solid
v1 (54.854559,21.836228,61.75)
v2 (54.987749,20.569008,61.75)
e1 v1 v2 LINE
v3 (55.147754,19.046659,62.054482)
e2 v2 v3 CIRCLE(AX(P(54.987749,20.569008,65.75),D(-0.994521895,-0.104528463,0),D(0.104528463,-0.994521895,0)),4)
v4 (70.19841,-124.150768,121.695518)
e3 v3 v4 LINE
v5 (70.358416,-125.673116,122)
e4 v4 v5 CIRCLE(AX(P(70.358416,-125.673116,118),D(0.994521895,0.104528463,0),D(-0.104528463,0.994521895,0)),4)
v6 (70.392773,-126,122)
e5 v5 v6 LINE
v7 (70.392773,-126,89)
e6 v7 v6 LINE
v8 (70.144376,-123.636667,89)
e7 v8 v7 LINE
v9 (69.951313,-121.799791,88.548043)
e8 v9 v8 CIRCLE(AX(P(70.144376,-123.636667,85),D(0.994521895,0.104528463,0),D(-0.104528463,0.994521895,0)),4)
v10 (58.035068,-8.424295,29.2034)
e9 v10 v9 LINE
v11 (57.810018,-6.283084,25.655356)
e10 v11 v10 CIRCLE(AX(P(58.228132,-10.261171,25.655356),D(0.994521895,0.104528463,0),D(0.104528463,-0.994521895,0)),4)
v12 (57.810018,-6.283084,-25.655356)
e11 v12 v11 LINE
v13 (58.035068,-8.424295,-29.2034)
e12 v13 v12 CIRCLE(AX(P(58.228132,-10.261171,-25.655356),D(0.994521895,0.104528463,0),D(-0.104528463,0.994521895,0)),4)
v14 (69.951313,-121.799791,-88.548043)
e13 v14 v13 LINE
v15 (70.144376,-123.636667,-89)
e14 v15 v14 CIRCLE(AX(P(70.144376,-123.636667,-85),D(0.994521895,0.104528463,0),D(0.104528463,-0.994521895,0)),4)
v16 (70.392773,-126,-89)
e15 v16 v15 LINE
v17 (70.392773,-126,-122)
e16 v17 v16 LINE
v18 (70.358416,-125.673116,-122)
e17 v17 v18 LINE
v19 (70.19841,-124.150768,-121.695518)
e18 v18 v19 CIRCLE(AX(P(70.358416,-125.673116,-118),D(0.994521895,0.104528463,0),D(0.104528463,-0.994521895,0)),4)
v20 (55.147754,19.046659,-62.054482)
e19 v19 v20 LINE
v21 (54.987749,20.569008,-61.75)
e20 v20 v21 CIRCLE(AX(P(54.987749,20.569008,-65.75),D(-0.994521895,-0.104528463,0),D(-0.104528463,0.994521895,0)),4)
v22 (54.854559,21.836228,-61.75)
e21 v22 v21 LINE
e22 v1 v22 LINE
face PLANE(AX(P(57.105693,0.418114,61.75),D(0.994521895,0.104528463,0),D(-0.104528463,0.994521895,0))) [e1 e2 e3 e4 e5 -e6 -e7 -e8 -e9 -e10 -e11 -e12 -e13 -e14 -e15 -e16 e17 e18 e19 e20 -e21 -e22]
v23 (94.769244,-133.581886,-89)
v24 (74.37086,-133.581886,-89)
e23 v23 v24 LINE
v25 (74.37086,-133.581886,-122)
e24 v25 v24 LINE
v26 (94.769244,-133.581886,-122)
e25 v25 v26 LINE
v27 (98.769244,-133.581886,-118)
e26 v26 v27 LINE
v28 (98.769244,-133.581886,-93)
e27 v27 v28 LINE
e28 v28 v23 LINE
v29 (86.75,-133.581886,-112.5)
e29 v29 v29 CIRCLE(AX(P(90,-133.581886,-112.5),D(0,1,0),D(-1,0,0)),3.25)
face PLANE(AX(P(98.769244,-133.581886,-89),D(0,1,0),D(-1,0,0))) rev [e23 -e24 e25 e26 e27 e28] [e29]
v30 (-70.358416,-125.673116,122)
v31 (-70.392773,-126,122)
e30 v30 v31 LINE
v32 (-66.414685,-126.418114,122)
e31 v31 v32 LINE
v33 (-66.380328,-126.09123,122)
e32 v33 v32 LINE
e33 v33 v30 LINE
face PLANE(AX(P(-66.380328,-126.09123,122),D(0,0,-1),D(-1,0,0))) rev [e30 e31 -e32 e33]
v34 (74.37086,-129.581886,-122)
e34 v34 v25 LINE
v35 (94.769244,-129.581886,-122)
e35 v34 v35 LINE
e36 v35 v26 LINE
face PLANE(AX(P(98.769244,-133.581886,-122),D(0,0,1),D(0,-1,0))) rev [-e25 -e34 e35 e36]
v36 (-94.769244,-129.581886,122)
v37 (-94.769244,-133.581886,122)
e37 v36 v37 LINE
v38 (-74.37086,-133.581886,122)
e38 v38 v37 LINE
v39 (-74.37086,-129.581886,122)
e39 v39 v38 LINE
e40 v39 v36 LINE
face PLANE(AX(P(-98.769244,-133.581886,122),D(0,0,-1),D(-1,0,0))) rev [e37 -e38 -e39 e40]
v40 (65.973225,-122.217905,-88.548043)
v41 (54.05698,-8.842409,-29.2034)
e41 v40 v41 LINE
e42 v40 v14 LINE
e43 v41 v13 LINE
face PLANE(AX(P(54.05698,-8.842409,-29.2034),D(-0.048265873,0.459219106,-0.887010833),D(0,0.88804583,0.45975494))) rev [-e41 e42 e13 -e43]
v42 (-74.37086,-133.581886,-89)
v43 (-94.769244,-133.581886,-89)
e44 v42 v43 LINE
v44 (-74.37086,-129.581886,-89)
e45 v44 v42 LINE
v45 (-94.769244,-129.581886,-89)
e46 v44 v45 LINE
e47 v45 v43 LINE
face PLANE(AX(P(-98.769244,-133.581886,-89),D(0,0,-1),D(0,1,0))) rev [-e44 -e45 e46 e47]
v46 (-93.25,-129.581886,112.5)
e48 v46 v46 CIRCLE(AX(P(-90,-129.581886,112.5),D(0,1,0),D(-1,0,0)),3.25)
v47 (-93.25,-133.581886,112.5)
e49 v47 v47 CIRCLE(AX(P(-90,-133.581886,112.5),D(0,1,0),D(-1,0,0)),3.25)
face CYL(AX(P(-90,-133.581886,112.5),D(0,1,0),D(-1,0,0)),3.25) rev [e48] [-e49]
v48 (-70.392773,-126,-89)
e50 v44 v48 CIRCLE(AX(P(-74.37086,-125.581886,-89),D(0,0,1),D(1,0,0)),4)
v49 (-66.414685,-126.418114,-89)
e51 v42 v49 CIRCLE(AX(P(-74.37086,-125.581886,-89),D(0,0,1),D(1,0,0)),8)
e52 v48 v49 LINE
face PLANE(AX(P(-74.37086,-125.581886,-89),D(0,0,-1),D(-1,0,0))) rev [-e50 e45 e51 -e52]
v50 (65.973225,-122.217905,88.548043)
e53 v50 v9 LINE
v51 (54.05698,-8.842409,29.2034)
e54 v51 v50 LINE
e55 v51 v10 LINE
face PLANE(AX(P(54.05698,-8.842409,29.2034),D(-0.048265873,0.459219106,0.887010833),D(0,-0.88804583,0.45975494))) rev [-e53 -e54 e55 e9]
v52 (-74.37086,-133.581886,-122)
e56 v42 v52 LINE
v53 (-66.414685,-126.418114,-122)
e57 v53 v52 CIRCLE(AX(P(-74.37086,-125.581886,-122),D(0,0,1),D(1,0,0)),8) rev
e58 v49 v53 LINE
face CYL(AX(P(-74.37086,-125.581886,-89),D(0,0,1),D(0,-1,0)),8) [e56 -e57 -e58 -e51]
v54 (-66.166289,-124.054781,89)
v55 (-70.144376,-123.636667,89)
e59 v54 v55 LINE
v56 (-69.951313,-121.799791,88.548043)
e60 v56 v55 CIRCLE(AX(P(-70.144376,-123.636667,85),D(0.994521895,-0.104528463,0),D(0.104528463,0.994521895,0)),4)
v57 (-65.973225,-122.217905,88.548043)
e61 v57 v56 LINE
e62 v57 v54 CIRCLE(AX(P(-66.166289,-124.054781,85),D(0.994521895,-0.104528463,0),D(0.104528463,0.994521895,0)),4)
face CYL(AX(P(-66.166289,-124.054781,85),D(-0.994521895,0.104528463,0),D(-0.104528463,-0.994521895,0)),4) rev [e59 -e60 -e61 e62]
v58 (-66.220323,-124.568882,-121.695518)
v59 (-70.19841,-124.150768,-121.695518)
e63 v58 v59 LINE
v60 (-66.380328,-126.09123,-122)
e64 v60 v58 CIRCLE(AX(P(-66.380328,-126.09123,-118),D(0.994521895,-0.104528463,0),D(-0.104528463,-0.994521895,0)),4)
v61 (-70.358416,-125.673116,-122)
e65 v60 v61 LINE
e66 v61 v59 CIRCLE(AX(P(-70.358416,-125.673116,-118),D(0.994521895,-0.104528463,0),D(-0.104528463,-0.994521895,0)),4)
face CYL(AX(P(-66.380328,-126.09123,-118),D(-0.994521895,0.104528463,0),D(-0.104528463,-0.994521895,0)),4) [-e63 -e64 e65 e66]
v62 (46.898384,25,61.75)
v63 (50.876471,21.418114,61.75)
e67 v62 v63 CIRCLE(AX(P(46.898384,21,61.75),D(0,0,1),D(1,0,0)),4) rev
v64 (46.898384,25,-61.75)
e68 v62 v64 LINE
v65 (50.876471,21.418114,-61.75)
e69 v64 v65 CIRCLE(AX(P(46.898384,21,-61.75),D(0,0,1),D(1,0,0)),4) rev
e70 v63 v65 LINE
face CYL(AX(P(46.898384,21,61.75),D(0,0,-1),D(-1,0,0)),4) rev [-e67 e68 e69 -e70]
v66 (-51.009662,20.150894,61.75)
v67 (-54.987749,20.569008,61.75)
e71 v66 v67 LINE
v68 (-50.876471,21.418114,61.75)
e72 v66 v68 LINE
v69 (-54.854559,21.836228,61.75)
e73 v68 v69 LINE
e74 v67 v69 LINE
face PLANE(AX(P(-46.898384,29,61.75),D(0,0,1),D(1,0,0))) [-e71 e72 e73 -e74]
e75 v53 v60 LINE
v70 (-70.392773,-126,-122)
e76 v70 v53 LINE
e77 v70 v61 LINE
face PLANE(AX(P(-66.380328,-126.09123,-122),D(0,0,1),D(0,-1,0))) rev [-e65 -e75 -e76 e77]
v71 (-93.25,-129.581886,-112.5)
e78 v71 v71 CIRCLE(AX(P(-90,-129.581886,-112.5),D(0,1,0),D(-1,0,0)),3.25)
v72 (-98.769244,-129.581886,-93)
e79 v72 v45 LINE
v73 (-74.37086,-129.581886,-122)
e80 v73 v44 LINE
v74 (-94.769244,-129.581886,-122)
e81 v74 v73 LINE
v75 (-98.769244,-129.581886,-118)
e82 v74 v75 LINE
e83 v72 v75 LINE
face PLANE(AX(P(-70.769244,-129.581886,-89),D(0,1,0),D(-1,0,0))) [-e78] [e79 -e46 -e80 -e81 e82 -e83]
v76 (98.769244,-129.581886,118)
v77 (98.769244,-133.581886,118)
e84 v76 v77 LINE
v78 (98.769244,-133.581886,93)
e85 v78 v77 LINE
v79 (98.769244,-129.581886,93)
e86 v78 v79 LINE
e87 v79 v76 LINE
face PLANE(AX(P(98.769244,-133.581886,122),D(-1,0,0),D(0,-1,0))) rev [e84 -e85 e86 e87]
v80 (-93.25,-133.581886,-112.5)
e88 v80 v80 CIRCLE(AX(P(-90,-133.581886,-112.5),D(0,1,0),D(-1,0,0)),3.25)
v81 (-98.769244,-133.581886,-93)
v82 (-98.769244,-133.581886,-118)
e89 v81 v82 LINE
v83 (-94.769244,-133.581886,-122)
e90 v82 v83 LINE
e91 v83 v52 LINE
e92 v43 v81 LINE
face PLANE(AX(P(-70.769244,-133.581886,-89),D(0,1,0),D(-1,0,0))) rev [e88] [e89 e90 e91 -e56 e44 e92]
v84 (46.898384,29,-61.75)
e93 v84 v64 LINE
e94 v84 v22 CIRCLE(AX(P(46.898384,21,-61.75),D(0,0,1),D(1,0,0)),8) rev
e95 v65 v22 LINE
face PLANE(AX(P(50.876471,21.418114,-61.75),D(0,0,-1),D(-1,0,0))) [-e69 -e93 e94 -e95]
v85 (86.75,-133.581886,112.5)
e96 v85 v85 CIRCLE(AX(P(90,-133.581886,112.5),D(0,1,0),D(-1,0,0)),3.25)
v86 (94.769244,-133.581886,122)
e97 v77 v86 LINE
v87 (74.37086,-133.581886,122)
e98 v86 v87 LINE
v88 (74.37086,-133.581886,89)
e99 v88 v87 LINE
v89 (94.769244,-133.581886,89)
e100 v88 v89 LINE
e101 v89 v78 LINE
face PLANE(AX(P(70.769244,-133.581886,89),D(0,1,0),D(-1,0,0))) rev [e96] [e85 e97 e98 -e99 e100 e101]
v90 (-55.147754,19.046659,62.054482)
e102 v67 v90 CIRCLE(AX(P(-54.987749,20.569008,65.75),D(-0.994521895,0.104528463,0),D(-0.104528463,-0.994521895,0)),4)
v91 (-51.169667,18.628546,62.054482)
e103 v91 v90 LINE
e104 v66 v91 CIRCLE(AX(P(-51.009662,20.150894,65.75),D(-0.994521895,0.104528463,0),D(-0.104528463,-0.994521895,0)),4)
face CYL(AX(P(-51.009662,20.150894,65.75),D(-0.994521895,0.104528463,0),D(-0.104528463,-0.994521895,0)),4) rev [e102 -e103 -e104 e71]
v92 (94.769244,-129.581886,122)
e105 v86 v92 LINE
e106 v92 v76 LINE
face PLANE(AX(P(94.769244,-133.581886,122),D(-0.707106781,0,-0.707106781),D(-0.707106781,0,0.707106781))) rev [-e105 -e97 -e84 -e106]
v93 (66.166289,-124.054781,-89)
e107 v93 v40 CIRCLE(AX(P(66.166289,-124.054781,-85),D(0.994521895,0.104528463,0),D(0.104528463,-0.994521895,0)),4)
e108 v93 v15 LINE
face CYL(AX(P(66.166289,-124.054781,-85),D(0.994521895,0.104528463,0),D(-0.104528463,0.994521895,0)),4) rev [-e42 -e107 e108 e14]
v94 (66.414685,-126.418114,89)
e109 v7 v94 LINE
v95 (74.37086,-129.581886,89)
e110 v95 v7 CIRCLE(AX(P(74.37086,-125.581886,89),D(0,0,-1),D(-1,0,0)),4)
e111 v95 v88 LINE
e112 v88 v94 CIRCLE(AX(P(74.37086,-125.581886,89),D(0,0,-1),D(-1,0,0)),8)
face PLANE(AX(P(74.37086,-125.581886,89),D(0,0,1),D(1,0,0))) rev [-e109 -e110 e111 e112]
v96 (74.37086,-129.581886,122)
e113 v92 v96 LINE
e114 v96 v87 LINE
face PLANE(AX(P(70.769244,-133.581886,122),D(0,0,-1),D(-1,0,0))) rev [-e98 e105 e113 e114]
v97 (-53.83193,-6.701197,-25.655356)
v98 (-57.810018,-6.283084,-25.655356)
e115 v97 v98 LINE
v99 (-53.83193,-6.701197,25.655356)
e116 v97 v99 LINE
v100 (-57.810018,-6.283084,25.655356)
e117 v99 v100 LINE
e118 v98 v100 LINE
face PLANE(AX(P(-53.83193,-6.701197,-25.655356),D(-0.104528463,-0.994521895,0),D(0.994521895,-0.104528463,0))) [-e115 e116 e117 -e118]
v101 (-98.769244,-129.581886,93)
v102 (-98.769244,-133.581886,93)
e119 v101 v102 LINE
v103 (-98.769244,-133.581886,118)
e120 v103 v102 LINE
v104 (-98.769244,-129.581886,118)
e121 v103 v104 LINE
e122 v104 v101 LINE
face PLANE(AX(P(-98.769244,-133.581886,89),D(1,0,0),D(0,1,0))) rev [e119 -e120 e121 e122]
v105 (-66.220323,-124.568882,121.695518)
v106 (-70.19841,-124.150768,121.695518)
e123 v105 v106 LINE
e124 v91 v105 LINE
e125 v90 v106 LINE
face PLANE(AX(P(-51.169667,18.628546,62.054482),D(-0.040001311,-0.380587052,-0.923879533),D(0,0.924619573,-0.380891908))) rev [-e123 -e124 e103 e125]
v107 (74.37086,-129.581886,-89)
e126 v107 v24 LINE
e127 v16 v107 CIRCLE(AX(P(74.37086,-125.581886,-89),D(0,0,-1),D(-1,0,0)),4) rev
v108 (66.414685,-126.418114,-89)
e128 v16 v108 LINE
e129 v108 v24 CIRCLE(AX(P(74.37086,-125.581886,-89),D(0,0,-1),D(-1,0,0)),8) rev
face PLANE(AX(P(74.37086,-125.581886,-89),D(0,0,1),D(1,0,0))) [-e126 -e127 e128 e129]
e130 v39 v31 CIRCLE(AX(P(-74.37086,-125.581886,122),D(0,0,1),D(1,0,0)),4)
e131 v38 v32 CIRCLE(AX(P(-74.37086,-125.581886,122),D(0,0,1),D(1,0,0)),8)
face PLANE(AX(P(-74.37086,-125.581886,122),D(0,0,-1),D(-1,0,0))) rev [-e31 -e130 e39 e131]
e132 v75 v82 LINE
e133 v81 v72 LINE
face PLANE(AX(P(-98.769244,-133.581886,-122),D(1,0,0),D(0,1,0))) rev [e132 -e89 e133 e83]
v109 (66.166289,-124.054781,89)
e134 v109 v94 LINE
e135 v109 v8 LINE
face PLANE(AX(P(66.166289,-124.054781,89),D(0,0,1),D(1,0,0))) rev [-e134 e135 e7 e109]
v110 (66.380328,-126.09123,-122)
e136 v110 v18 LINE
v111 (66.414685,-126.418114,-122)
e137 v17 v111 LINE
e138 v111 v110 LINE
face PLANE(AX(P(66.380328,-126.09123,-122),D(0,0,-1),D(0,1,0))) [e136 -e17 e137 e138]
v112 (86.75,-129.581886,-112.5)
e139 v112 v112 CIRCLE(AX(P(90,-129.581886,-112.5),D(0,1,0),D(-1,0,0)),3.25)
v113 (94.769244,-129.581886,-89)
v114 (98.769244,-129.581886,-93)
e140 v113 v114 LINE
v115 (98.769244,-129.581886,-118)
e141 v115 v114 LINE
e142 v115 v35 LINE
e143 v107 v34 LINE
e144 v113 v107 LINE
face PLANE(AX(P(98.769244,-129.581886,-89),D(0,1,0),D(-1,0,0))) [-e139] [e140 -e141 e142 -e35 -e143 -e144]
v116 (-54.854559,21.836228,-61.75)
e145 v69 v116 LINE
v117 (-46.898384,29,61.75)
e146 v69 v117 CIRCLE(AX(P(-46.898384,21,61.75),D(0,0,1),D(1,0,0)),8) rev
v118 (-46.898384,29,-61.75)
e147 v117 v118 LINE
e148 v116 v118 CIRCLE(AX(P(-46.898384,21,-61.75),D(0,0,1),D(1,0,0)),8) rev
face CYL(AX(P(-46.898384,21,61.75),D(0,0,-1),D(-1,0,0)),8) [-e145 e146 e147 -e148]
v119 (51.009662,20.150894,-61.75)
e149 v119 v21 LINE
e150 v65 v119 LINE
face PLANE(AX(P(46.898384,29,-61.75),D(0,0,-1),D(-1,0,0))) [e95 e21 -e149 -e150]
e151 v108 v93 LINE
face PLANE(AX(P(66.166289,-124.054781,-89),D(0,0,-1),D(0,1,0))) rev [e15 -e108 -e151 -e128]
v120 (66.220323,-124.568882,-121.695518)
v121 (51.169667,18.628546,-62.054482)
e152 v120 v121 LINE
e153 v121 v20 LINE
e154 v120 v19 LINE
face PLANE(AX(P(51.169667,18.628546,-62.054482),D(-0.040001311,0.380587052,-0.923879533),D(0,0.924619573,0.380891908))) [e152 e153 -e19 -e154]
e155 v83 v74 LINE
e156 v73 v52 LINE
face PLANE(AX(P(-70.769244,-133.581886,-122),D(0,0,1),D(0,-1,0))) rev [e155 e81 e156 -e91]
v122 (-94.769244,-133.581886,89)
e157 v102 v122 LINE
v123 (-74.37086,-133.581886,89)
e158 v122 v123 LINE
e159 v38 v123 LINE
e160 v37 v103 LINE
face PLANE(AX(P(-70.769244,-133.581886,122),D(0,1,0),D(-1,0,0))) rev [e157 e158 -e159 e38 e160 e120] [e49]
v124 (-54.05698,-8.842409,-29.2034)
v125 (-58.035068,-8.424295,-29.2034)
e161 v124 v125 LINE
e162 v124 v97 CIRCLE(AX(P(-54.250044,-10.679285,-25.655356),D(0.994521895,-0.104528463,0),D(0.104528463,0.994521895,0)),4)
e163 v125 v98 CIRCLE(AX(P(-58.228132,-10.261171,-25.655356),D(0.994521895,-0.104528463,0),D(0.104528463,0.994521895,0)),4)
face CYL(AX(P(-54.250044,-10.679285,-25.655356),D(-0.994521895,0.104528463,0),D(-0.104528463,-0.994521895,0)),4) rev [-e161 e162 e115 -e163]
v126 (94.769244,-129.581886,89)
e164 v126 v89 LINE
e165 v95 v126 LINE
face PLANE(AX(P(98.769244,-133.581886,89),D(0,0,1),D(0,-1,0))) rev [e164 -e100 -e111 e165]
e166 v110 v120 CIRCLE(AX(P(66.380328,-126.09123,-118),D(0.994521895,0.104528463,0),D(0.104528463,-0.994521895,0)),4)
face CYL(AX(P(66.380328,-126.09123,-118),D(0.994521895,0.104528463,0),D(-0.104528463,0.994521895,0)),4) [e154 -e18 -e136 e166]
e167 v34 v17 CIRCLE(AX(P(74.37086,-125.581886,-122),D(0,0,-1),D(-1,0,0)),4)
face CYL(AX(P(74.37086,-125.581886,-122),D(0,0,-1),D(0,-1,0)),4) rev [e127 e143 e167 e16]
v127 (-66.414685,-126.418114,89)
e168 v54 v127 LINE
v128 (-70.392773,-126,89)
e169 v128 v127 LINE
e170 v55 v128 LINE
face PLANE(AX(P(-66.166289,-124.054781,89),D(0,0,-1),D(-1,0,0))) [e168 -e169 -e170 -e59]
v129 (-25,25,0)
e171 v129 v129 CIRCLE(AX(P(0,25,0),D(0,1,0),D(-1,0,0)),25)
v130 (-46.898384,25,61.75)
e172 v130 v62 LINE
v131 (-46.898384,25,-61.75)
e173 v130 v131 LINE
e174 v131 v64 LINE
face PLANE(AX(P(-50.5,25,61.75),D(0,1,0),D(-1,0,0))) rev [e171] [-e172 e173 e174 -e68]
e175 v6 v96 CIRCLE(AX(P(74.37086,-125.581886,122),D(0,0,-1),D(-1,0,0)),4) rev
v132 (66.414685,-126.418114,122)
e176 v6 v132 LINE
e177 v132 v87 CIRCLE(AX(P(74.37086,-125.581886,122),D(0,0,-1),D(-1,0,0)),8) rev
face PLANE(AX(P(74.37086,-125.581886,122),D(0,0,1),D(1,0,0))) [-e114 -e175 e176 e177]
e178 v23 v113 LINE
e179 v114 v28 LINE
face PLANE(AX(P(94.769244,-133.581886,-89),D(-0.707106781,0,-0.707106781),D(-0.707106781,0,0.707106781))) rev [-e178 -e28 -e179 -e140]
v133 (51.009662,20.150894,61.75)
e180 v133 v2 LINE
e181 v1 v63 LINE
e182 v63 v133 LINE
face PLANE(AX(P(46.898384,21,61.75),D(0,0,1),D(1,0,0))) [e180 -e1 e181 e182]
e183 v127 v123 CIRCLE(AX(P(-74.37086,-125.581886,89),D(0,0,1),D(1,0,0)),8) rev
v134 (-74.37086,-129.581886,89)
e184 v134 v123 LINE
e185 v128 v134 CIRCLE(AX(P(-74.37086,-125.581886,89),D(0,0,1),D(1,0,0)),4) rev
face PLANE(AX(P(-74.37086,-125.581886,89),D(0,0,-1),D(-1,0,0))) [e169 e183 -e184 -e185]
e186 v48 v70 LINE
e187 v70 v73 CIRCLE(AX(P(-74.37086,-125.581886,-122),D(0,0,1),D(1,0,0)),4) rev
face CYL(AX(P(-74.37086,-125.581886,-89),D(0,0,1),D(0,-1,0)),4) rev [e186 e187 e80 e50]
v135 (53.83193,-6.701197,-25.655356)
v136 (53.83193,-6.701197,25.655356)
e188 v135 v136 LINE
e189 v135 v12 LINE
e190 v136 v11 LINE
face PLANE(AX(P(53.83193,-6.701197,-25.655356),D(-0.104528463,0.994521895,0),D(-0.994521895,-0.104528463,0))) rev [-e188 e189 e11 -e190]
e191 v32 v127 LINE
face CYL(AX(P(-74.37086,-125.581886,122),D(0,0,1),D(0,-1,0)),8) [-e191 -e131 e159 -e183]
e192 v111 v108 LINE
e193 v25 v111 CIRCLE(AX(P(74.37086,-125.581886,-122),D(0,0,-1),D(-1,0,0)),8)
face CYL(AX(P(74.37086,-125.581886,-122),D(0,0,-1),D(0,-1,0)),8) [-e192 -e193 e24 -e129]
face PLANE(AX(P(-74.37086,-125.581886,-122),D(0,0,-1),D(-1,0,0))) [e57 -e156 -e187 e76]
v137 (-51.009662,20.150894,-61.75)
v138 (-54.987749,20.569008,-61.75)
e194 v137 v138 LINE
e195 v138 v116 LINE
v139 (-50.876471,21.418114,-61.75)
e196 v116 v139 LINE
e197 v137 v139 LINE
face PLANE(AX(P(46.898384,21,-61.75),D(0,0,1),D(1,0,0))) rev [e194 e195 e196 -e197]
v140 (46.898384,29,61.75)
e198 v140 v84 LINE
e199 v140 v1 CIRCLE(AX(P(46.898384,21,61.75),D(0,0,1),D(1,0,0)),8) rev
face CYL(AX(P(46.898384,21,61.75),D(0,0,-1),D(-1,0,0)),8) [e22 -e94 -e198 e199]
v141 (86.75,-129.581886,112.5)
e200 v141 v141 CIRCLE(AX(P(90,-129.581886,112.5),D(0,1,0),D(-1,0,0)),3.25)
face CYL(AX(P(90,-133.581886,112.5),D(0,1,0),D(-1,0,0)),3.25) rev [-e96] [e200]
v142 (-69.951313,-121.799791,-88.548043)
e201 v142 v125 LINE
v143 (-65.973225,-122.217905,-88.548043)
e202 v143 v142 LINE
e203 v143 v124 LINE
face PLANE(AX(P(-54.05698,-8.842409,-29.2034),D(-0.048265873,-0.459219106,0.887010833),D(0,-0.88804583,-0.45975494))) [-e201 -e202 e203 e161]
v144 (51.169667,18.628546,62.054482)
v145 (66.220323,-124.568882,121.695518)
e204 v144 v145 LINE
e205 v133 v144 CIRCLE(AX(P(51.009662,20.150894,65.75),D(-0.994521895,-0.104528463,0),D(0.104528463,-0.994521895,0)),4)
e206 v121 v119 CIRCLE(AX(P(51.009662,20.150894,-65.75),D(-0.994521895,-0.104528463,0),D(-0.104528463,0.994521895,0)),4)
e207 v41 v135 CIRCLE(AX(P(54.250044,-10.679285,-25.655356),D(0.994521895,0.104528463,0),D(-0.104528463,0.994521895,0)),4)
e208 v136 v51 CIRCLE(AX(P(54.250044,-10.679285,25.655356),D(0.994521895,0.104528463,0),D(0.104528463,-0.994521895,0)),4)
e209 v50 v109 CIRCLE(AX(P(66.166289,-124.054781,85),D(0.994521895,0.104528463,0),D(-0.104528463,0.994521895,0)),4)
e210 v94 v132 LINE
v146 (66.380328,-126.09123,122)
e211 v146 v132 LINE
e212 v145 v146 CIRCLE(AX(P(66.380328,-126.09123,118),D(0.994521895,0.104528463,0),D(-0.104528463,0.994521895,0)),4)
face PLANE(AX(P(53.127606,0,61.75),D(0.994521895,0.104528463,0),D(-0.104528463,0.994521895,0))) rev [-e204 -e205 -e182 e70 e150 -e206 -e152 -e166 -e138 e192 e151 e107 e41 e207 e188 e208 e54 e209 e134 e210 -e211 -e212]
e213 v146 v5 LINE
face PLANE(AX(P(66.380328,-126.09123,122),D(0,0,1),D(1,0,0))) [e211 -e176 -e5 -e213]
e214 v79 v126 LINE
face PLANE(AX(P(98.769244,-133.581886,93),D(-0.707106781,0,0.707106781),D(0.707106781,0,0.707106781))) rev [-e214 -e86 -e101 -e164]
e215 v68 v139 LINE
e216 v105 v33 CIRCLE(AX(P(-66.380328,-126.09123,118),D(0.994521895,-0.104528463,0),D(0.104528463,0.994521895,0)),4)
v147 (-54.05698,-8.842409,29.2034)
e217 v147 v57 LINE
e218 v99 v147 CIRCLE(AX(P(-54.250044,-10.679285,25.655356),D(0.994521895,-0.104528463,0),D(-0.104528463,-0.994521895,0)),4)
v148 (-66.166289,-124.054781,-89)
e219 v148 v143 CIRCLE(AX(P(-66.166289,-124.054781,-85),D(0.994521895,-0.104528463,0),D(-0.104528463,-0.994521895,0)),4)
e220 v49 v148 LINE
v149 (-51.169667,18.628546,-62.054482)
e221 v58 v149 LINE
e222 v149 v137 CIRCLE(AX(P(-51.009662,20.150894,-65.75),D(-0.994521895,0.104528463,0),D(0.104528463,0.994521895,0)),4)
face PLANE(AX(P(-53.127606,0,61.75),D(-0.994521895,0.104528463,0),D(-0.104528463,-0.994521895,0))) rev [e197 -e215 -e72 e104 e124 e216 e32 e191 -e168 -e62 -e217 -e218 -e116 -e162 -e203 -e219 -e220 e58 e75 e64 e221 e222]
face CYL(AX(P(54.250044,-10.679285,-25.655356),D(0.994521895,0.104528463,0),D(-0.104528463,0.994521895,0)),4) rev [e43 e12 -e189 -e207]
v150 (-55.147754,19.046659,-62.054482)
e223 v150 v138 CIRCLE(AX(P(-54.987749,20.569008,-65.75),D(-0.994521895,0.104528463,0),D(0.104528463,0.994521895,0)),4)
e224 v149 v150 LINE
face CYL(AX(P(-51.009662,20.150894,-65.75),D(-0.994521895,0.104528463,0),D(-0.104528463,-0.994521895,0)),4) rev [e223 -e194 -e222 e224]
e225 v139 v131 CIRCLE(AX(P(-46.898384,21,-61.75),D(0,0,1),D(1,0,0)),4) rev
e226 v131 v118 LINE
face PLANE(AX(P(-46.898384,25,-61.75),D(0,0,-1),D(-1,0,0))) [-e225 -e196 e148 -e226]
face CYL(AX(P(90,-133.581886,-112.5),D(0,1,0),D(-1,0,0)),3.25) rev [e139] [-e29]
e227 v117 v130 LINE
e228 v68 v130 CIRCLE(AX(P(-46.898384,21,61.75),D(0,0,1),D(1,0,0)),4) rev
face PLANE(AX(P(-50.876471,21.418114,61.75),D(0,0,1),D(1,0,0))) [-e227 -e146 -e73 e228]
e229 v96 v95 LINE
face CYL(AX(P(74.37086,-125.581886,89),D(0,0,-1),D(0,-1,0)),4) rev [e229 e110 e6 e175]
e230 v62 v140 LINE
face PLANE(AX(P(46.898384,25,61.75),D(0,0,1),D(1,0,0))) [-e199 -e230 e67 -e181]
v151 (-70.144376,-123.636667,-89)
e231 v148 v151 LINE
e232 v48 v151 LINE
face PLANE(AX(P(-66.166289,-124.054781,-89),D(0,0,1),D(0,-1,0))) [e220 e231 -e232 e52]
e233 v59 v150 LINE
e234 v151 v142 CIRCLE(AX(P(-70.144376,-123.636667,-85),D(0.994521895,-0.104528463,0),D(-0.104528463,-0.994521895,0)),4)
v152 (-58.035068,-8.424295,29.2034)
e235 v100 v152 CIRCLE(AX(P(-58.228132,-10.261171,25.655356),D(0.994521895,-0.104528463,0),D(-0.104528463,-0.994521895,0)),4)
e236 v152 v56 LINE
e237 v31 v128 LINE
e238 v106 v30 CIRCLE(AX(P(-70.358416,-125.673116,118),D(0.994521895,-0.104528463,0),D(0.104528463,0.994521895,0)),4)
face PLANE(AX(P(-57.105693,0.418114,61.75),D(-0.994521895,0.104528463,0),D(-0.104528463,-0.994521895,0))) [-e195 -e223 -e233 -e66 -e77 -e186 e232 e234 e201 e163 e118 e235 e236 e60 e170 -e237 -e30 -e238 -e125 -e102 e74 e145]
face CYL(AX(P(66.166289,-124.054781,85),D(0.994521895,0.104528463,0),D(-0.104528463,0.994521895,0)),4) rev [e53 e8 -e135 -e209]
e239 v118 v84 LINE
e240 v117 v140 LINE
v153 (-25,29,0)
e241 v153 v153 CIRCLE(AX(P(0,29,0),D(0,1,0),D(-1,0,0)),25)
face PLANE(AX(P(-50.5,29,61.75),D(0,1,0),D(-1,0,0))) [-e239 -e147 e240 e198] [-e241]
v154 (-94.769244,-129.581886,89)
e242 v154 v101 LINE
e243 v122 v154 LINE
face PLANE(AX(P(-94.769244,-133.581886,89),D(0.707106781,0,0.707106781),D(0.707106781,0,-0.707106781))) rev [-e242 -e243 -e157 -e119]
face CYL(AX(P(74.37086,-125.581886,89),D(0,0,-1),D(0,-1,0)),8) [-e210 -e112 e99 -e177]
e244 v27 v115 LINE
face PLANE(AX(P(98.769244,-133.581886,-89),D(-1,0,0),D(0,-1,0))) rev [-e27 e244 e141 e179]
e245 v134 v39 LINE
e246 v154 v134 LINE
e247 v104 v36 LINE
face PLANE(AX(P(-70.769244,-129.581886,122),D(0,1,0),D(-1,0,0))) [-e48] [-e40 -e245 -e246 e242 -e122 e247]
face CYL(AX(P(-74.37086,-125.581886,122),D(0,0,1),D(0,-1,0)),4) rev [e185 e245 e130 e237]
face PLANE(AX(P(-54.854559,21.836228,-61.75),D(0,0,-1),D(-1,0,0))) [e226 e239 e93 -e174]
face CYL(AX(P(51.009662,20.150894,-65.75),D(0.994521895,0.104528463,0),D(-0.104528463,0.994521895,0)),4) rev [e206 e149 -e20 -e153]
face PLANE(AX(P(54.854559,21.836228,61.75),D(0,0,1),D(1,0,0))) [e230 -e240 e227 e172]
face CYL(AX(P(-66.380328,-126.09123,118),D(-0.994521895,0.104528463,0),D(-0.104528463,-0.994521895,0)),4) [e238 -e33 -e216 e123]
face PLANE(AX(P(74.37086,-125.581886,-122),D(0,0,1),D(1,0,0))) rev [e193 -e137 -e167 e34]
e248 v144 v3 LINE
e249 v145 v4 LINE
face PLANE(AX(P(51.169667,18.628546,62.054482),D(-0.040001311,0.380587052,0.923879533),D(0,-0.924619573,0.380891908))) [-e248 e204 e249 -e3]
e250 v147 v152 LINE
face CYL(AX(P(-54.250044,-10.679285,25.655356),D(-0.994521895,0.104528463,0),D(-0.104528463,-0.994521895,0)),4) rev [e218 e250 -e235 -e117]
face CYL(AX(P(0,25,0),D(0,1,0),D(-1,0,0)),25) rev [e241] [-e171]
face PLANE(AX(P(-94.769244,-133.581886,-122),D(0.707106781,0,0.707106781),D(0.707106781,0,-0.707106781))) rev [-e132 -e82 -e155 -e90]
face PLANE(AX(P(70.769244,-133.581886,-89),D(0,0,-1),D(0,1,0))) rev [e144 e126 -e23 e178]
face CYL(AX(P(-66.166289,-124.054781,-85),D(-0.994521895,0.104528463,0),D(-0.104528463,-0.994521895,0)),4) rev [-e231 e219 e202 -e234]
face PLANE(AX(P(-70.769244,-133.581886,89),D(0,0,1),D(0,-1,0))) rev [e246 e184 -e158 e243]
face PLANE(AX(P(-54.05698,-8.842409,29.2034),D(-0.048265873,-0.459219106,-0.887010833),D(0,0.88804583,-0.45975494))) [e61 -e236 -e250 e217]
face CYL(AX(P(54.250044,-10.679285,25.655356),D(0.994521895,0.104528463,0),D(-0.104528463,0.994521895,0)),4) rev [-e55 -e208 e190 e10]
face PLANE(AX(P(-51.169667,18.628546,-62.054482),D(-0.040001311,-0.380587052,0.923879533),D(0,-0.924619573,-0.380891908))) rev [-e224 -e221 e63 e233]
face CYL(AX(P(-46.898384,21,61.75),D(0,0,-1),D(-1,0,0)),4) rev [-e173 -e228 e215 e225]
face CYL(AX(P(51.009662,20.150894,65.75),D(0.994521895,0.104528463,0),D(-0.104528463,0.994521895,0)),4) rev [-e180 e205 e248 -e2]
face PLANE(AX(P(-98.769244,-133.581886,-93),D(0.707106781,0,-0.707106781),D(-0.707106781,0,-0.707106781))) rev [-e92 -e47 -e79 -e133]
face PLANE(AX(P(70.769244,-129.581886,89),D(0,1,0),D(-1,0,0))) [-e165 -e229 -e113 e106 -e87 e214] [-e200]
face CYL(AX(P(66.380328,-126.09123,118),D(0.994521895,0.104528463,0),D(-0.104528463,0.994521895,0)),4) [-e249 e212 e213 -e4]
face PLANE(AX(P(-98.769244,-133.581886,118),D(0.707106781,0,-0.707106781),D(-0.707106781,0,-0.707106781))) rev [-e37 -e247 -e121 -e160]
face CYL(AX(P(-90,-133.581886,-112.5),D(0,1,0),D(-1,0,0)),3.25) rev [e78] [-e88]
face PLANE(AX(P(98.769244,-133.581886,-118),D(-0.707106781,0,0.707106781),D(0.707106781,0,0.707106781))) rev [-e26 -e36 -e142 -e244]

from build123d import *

# Parameters (mm, degrees)
SM_BASE_FLANGE_1_DEPTH   = 61.75
SKETCH_3_R               = 25
CUT_EXTRUDE_1_DEPTH      = 4
EXTRUDE_2_DEPTH          = 4
CUT_EXTRUDE_3_DEPTH      = 4
SM_START                 = -122
SM_EDGE_FLANGE_1_DEPTH   = 244
SM_EDGE_FLANGE_1_2_DEPTH = 33
SM_START_2               = 89
SM_EDGE_FLANGE_1_3_DEPTH = 33
SKETCH_44_R              = 3.25
CUT_EXTRUDE_4_DEPTH      = 4
CHAMFER_1_SIZE           = 4


# Read off the part's stored shape, not the designer's step: Ребро-кромка1
# Sheet-metal steps are written as plain solids
with BuildPart() as part:
    # Sketch 1 → Базовая кромка1 (new, symmetric)
    with BuildSketch(Plane.XY):
        with BuildLine():
            Line((-67.211573407, -134), (-53.127605882, 0))
            Line((-53.127605882, 0), (-50.876471404, 21.418113853))
            ThreePointArc((-50.876471404, 21.418113853), (-49.574906248, 23.972579302), (-46.898383823, 25))
            Line((-46.898383823, 25), (46.898383823, 25))
            ThreePointArc((46.898383823, 25), (49.574906248, 23.972579302), (50.876471404, 21.418113853))
            Line((50.876471404, 21.418113853), (53.127605882, 0))
            Line((53.127605882, 0), (67.211573407, -134))
            Line((67.211573407, -134), (71.189660989, -133.581886147))
            Line((71.189660989, -133.581886147), (57.105693463, 0.418113853))
            Line((57.105693463, 0.418113853), (54.854558986, 21.836227706))
            ThreePointArc((54.854558986, 21.836227706), (52.251428674, 26.945158604), (46.898383823, 29))
            Line((46.898383823, 29), (-46.898383823, 29))
            ThreePointArc((-46.898383823, 29), (-52.251428674, 26.945158604), (-54.854558986, 21.836227706))
            Line((-54.854558986, 21.836227706), (-57.105693463, 0.418113853))
            Line((-57.105693463, 0.418113853), (-71.189660989, -133.581886147))
            Line((-71.189660989, -133.581886147), (-67.211573407, -134))
        make_face()
    extrude(amount=SM_BASE_FLANGE_1_DEPTH, both=True)

    # Эскиз3 → Вытянуть1 (cut)
    with BuildSketch(Plane(origin=(0, 29, 0), x_dir=(1, 0, 0), z_dir=(0, 1, 0))):
        with Locations(Location((0, 0, 0), (0, 0, 180))):
            Circle(SKETCH_3_R)
    extrude(amount=-CUT_EXTRUDE_1_DEPTH, mode=Mode.SUBTRACT)

    # Эскиз33 → Вытянуть2 (add)
    with BuildSketch(Plane(origin=(56.525210635, 5.941039037, 0), x_dir=(0, 0, -1), z_dir=(0.9945218953682734, 0.10452846326765315, 0))):
        with BuildLine():
            Line((-62.05448187, 13.177809809), (-121.69551813, -130.808388804))
            ThreePointArc((-121.69551813, -130.808388804), (-121.923141122, -131.558761245), (-122, -132.339122533))
            Line((-122, -132.339122533), (-122, -140.291456461))
            Line((-122, -140.291456461), (-61.75, -140.291456461))
            Line((-61.75, -140.291456461), (-61.75, 14.708543539))
            ThreePointArc((-61.75, 14.708543539), (-61.826858878, 13.928182251), (-62.05448187, 13.177809809))
        make_face()
        with BuildLine():
            Line((122, -132.339122533), (122, -140.291456461))
            Line((122, -140.291456461), (61.75, -140.291456461))
            Line((61.75, -140.291456461), (61.75, 14.708543539))
            ThreePointArc((61.75, 14.708543539), (61.826858878, 13.928182251), (62.05448187, 13.177809809))
            Line((62.05448187, 13.177809809), (121.69551813, -130.808388804))
            ThreePointArc((121.69551813, -130.808388804), (121.923141122, -131.558761245), (122, -132.339122533))
        make_face()
    extrude_2 = extrude(amount=-EXTRUDE_2_DEPTH)

    # Эскиз39 → Вытянуть3 (cut)
    with BuildSketch(Plane(origin=(56.525210635, 5.941039037, 0), x_dir=(0, 0, -1), z_dir=(0.9945218953682734, 0.10452846326765315, 0))):
        with BuildLine():
            Line((25.655356237, -12.291456461), (-25.655356237, -12.291456461))
            ThreePointArc((-25.655356237, -12.291456461), (-27.73044927, -12.871808979), (-29.20339957, -14.444462008))
            Line((-29.20339957, -14.444462008), (-88.548043333, -128.444462008))
            ThreePointArc((-88.548043333, -128.444462008), (-88.885368279, -129.340712892), (-89, -130.291456461))
            Line((-89, -130.291456461), (-89, -140.291456461))
            Line((-89, -140.291456461), (89, -140.291456461))
            Line((89, -140.291456461), (89, -130.291456461))
            ThreePointArc((89, -130.291456461), (88.885368279, -129.340712892), (88.548043333, -128.444462008))
            Line((88.548043333, -128.444462008), (29.20339957, -14.444462008))
            ThreePointArc((29.20339957, -14.444462008), (27.73044927, -12.871808979), (25.655356237, -12.291456461))
        make_face()
    cut_extrude_3 = extrude(amount=-CUT_EXTRUDE_3_DEPTH, mode=Mode.SUBTRACT)

    # Зеркальное отражение1: Вытянуть2, Вытянуть3 across plane
    add(extrude_2.mirror(Plane(origin=(0, 0, 0), x_dir=(0, 0, 1), z_dir=(1, 0, 0))))
    add(cut_extrude_3.mirror(Plane(origin=(0, 0, 0), x_dir=(0, 0, 1), z_dir=(1, 0, 0))), mode=Mode.SUBTRACT)

    # Ребро-кромка1 outline → Ребро-кромка1 (cut)
    with BuildSketch(Plane.XY.offset(SM_START)):
        with BuildLine():
            Line((71.189660989, -133.581886147), (71.116967081, -132.890249808))
            ThreePointArc((71.116967081, -132.890249808), (67.89872427, -130.284168166), (66.414685062, -126.418113853))
            Line((66.414685062, -126.418113853), (67.211573407, -134))
            Line((67.211573407, -134), (71.189660989, -133.581886147))
        make_face()
        with BuildLine():
            ThreePointArc((-66.414685062, -126.418113853), (-67.89872427, -130.284168166), (-71.116967081, -132.890249808))
            Line((-71.116967081, -132.890249808), (-71.189660989, -133.581886147))
            Line((-71.189660989, -133.581886147), (-67.211573407, -134))
            Line((-67.211573407, -134), (-66.414685062, -126.418113853))
        make_face()
    extrude(amount=SM_EDGE_FLANGE_1_DEPTH, mode=Mode.SUBTRACT)

    # Sm Edge Flange 1 2 outline → Sm Edge Flange 1 2 (add)
    with BuildSketch(Plane.XY.offset(SM_START)):
        with BuildLine():
            ThreePointArc((71.116967081, -132.890249808), (72.707566699, -133.407066953), (74.370860225, -133.581886147))
            Line((74.370860225, -133.581886147), (98.769244048, -133.581886147))
            Line((98.769244048, -133.581886147), (98.769244048, -129.581886147))
            Line((98.769244048, -129.581886147), (74.370860225, -129.581886147))
            ThreePointArc((74.370860225, -129.581886147), (71.694337799, -128.554465449), (70.392772643, -126))
            Line((70.392772643, -126), (71.116967081, -132.890249808))
        make_face()
        with BuildLine():
            Line((-98.769244048, -133.581886147), (-74.370860225, -133.581886147))
            ThreePointArc((-74.370860225, -133.581886147), (-72.707566699, -133.407066953), (-71.116967081, -132.890249808))
            Line((-71.116967081, -132.890249808), (-70.392772643, -126))
            ThreePointArc((-70.392772643, -126), (-71.694337799, -128.554465449), (-74.370860225, -129.581886147))
            Line((-74.370860225, -129.581886147), (-98.769244048, -129.581886147))
            Line((-98.769244048, -129.581886147), (-98.769244048, -133.581886147))
        make_face()
    extrude(amount=SM_EDGE_FLANGE_1_2_DEPTH)

    # Sm Edge Flange 1 3 outline → Sm Edge Flange 1 3 (add)
    with BuildSketch(Plane.XY.offset(SM_START_2)):
        with BuildLine():
            ThreePointArc((71.116967081, -132.890249808), (72.707566699, -133.407066953), (74.370860225, -133.581886147))
            Line((74.370860225, -133.581886147), (98.769244048, -133.581886147))
            Line((98.769244048, -133.581886147), (98.769244048, -129.581886147))
            Line((98.769244048, -129.581886147), (74.370860225, -129.581886147))
            ThreePointArc((74.370860225, -129.581886147), (71.694337799, -128.554465449), (70.392772643, -126))
            Line((70.392772643, -126), (71.116967081, -132.890249808))
        make_face()
        with BuildLine():
            Line((-98.769244048, -133.581886147), (-74.370860225, -133.581886147))
            ThreePointArc((-74.370860225, -133.581886147), (-72.707566699, -133.407066953), (-71.116967081, -132.890249808))
            Line((-71.116967081, -132.890249808), (-70.392772643, -126))
            ThreePointArc((-70.392772643, -126), (-71.694337799, -128.554465449), (-74.370860225, -129.581886147))
            Line((-74.370860225, -129.581886147), (-98.769244048, -129.581886147))
            Line((-98.769244048, -129.581886147), (-98.769244048, -133.581886147))
        make_face()
    extrude(amount=SM_EDGE_FLANGE_1_3_DEPTH)

    # Эскиз44 → Вытянуть4 (cut)
    with BuildSketch(Plane(origin=(0, -129.581886147, 0), x_dir=(1, 0, 0), z_dir=(0, 1, 0))):
        with Locations(Location((90, -112.5, 0), (0, 0, 180))):
            Circle(SKETCH_44_R)
        with Locations(Location((90, 112.5, 0), (0, 0, 180))):
            Circle(SKETCH_44_R)
        with Locations(Location((-90, 112.5, 0), (0, 0, 180))):
            Circle(SKETCH_44_R)
        with Locations(Location((-90, -112.5, 0), (0, 0, 180))):
            Circle(SKETCH_44_R)
    extrude(amount=-CUT_EXTRUDE_4_DEPTH, mode=Mode.SUBTRACT)

    # Фаска1
    chamfer_1_edges = [part.edges().sort_by_distance(p)[0] for p in [
        (98.769244048, -131.581886147, 122),
        (98.769244048, -131.581886147, 89),
        (-98.769244048, -131.581886147, 89),
        (-98.769244048, -131.581886147, 122),
        (98.769244048, -131.581886147, -89),
        (98.769244048, -131.581886147, -122),
        (-98.769244048, -131.581886147, -122),
        (-98.769244048, -131.581886147, -89),
    ]]
    chamfer(chamfer_1_edges, length=CHAMFER_1_SIZE)


solid = part.part
